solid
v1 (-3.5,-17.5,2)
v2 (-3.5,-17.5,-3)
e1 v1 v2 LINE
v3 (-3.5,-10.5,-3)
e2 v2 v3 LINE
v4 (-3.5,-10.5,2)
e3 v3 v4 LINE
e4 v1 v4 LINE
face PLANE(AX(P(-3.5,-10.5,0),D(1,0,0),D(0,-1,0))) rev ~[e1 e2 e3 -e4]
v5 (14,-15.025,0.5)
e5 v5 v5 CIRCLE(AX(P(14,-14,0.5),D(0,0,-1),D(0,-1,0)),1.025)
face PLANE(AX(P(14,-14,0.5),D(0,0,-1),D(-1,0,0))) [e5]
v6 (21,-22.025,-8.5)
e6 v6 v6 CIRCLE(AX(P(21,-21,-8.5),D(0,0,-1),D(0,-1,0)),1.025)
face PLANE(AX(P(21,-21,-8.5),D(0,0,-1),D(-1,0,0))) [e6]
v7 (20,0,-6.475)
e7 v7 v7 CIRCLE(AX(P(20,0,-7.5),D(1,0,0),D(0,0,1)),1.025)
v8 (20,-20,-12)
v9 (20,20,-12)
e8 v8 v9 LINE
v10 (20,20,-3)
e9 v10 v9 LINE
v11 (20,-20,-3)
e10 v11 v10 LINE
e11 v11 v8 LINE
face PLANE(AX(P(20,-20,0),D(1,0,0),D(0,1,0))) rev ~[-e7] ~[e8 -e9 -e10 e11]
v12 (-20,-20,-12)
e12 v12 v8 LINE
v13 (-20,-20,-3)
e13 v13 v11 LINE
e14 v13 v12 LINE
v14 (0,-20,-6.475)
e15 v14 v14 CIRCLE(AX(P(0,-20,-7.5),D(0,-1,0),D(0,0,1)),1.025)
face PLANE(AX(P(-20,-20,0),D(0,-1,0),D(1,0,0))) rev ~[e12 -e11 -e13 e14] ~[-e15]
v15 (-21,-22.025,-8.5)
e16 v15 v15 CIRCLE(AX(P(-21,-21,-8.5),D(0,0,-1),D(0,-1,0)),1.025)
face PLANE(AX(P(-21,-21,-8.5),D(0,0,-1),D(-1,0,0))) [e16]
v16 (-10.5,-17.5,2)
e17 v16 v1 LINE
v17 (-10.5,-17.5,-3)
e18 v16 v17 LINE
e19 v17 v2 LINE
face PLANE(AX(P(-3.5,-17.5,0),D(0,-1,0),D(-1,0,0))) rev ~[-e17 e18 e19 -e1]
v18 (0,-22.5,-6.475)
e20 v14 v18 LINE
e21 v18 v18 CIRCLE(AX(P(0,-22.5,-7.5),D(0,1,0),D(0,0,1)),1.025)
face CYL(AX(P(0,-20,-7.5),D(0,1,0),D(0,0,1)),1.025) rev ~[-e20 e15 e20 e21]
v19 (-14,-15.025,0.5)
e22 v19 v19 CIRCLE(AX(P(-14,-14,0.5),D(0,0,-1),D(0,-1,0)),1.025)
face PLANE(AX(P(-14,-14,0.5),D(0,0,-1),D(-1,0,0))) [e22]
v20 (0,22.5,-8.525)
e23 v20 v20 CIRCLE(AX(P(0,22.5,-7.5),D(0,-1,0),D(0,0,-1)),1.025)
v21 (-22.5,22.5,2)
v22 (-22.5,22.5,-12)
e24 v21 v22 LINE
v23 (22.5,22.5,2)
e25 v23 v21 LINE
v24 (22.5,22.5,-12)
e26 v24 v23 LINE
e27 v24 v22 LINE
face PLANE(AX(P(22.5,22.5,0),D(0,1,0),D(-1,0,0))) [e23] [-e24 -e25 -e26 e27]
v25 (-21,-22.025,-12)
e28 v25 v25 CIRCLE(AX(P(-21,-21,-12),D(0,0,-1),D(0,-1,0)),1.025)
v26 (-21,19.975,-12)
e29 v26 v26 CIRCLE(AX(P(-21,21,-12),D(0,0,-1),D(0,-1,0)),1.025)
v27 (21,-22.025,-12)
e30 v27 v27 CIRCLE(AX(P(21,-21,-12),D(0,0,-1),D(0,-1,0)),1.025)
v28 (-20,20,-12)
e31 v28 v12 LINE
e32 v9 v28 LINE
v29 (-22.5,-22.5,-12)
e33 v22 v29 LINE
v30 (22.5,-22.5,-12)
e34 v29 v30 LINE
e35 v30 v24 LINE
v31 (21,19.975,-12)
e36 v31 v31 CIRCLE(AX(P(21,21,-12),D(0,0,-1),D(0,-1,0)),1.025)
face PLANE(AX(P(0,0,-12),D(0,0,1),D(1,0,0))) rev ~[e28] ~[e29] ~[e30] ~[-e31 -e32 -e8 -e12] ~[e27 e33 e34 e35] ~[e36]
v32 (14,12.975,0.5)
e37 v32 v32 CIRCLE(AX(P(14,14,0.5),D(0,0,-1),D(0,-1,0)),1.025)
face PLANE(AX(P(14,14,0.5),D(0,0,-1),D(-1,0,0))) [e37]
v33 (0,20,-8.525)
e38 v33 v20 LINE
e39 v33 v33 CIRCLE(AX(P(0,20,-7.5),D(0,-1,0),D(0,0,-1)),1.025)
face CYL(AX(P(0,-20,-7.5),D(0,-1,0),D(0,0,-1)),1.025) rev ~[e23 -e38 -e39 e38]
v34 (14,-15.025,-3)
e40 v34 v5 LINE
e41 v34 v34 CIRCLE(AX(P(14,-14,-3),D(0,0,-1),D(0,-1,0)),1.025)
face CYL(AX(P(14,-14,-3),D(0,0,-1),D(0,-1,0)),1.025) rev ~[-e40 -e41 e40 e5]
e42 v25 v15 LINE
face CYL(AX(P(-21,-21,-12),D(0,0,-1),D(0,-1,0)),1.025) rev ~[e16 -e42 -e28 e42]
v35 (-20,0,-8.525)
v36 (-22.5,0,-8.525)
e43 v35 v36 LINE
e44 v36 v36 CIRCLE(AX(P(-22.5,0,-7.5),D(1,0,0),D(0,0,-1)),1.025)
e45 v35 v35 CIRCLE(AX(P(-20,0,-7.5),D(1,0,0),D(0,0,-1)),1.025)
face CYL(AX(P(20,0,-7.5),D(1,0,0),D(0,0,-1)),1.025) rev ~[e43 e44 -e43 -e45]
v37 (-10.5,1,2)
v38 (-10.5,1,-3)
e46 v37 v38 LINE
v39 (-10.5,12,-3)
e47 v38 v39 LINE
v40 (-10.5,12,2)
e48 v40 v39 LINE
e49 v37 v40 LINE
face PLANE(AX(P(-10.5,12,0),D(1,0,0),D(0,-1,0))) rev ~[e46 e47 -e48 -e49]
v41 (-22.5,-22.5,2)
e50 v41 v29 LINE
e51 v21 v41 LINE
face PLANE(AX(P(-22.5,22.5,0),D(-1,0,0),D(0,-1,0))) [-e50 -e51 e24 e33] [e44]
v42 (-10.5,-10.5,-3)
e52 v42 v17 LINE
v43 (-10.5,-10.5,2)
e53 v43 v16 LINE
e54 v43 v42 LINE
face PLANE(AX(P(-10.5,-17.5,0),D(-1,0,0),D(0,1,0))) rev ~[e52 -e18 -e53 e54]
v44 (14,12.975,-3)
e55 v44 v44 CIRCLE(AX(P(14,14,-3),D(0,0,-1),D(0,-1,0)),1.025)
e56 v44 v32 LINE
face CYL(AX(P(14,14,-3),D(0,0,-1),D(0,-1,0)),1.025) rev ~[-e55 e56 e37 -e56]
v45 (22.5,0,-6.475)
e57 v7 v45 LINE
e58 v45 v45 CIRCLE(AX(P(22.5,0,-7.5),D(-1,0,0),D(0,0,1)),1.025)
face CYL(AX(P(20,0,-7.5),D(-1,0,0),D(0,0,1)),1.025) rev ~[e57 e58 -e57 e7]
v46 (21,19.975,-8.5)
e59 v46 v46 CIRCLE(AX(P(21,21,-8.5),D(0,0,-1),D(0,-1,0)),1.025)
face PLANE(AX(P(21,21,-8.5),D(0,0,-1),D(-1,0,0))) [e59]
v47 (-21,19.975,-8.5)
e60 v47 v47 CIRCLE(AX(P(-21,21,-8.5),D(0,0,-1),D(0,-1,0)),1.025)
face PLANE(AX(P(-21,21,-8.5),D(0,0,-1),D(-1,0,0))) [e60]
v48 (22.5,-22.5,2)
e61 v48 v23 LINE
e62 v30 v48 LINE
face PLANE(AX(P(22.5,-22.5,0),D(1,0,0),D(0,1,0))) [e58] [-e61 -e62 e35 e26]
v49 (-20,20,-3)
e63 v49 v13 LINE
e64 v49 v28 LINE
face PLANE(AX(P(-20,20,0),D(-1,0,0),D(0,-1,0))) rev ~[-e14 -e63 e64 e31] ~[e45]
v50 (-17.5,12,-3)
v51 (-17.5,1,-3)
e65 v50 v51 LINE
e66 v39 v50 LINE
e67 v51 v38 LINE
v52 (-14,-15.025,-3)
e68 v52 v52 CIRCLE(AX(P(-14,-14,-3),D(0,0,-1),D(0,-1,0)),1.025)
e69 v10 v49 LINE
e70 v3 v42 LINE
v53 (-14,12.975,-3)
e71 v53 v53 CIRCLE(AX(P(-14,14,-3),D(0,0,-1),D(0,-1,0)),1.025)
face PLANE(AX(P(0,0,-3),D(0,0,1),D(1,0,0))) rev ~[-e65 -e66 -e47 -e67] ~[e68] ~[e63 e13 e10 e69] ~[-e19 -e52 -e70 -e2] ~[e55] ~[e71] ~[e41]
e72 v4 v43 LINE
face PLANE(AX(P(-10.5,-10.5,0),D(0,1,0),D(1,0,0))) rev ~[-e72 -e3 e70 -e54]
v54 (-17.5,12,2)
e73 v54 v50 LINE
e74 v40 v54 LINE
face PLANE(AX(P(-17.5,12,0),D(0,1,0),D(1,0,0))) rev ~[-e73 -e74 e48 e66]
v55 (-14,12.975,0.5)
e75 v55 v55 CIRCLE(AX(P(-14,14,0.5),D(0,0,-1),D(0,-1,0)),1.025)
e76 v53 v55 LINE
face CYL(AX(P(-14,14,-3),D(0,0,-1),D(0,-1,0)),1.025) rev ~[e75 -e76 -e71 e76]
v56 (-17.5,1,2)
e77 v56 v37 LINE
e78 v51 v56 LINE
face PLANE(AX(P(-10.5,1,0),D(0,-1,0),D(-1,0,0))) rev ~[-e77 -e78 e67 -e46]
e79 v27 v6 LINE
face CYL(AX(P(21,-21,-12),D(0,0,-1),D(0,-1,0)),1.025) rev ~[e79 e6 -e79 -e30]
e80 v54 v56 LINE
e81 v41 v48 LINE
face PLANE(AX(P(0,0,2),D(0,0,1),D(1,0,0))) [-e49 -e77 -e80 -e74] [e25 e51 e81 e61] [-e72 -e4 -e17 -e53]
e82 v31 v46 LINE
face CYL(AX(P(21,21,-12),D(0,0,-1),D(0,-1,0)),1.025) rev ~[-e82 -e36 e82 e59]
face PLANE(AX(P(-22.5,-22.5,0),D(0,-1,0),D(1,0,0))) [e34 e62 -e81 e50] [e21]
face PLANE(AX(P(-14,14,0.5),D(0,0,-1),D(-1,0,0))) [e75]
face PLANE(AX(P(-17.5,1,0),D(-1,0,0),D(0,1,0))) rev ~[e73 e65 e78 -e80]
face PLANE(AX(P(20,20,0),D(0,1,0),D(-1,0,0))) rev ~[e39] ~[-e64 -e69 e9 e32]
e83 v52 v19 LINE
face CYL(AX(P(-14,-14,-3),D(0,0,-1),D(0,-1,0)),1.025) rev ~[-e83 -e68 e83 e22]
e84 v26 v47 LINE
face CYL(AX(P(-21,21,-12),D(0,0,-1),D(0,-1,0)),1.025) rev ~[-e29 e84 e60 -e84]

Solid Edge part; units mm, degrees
sketch "Sketch1" plane through (0, 0, 0) normal (0, 0, 1) x (1, 0, 0)
  line L0 (-22.5, -22.5) -> (22.5, -22.5)
  line L1 (22.5, -22.5) -> (22.5, 22.5)
  line L2 (22.5, 22.5) -> (-22.5, 22.5)
  line L3 (-22.5, 22.5) -> (-22.5, -22.5)
  line L4 (-20, -20) -> (20, -20)
  line L5 (20, -20) -> (20, 20)
  line L6 (20, 20) -> (-20, 20)
  line L7 (-20, 20) -> (-20, -20)
  dimension "D1" = 40
  dimension "D2" = 40
  dimension "D3" = 45
  dimension "D4" = 45
extrude "Protrusion1" add sketch "Sketch1" against normal blind 12
sketch "Sketch2" plane through (0, 0, 0) normal (0, 0, 1) x (1, 0, 0)
  line L0 (-20, 20) -> (-20, -20)
  line L1 (-20, -20) -> (20, -20)
  line L2 (20, -20) -> (20, 20)
  line L3 (20, 20) -> (-20, 20)
extrude "ExtrudedProtrusion_2" add sketch "Sketch2" against normal blind 3
sketch "Sketch3" plane through (0, 0, -12) normal (0, 0, -1) x (0, -1, 0)
  circle A0 centre (-21, 21) radius 1.025
  circle A1 centre (-21, -21) radius 1.025
  circle A2 centre (21, -21) radius 1.025
  circle A3 centre (21, 21) radius 1.025
  dimension "D1" = 2.05
  dimension "D2" = 2.05
  dimension "D3" = 2.05
  dimension "D4" = 1.5
  dimension "D5" = 1.5
  dimension "D6" = 1.5
  dimension "D7" = 2.05
  dimension "D8" = 1.5
  dimension "D9" = 1.5
extrude "ExtrudedCutout_1" cut sketch "Sketch3" against normal blind 3.5
sketch "Sketch4" plane through (0, 0, 0) normal (0, 0, 1) x (0, 1, 0)
  line L0 (-17.5, 10.5) -> (-10.5, 10.5)
  line L1 (-10.5, 10.5) -> (-10.5, 3.5)
  line L2 (-10.5, 3.5) -> (-17.5, 3.5)
  line L3 (-17.5, 3.5) -> (-17.5, 10.5)
  line L4 (1, 17.5) -> (12, 17.5)
  line L5 (12, 17.5) -> (12, 10.5)
  line L6 (12, 10.5) -> (1, 10.5)
  line L7 (1, 10.5) -> (1, 17.5)
  dimension "D1" = 7
  dimension "D2" = 7
  dimension "D3" = 11
  dimension "D4" = 7
  dimension "D5" = 5
  dimension "D6" = 16
  dimension "D7" = 15.5
  dimension "D8" = 5
extrude "Cutout1" cut sketch "Sketch4" along normal through all and the other way through all
sketch "Sketch5" plane through (0, 0, 0) normal (0, 0, 1) x (1, 0, 0)
  line L0 (-22.5, 22.5) -> (-22.5, -22.5)
  line L1 (-22.5, -22.5) -> (22.5, -22.5)
  line L2 (22.5, -22.5) -> (22.5, 22.5)
  line L3 (22.5, 22.5) -> (-22.5, 22.5)
extrude "ExtrudedProtrusion_3" add sketch "Sketch5" along normal blind 2
sketch "Sketch6" plane through (0, 0, 0) normal (0, 0, 1) x (0, 1, 0)
  line L0 (1, 10.5) -> (1, 17.5)
  line L1 (1, 17.5) -> (12, 17.5)
  line L2 (12, 17.5) -> (12, 10.5)
  line L3 (12, 10.5) -> (1, 10.5)
  line L4 (-10.5, 10.5) -> (-10.5, 3.5)
  line L5 (-10.5, 3.5) -> (-17.5, 3.5)
  line L6 (-17.5, 3.5) -> (-17.5, 10.5)
  line L7 (-17.5, 10.5) -> (-10.5, 10.5)
  dimension "D1" = 7
  dimension "D2" = 7
  dimension "D3" = 11
  dimension "D4" = 7
  dimension "D5" = 5
  dimension "D6" = 16
  dimension "D7" = 15.5
  dimension "D8" = 5
extrude "ExtrudedCutout_4" cut sketch "Sketch6" along normal blind 33.1838
sketch "Sketch7" plane through (0, 0, -3) normal (0, 0, -1) x (0, -1, 0)
  circle A0 centre (-14, 14) radius 1.025
  circle A1 centre (14, 14) radius 1.025
  circle A2 centre (-14, -14) radius 1.025
  circle A3 centre (14, -14) radius 1.025
  dimension "D1" = 2.05
  dimension "D2" = 2.05
  dimension "D3" = 2.05
  dimension "D4" = 28
  dimension "D5" = 28
extrude "ExtrudedCutout_5" cut sketch "Sketch7" against normal blind 3.5
hole "Hole_2" at (20, 0, -7.5) direction (-1, 0, 0) diameter 2.05 end through all both ways yes
hole "Hole_3" at (0, -20, -7.5) direction (0, 1, 0) diameter 2.05 end through all both ways yes
properties part number "BumbleB0361"
